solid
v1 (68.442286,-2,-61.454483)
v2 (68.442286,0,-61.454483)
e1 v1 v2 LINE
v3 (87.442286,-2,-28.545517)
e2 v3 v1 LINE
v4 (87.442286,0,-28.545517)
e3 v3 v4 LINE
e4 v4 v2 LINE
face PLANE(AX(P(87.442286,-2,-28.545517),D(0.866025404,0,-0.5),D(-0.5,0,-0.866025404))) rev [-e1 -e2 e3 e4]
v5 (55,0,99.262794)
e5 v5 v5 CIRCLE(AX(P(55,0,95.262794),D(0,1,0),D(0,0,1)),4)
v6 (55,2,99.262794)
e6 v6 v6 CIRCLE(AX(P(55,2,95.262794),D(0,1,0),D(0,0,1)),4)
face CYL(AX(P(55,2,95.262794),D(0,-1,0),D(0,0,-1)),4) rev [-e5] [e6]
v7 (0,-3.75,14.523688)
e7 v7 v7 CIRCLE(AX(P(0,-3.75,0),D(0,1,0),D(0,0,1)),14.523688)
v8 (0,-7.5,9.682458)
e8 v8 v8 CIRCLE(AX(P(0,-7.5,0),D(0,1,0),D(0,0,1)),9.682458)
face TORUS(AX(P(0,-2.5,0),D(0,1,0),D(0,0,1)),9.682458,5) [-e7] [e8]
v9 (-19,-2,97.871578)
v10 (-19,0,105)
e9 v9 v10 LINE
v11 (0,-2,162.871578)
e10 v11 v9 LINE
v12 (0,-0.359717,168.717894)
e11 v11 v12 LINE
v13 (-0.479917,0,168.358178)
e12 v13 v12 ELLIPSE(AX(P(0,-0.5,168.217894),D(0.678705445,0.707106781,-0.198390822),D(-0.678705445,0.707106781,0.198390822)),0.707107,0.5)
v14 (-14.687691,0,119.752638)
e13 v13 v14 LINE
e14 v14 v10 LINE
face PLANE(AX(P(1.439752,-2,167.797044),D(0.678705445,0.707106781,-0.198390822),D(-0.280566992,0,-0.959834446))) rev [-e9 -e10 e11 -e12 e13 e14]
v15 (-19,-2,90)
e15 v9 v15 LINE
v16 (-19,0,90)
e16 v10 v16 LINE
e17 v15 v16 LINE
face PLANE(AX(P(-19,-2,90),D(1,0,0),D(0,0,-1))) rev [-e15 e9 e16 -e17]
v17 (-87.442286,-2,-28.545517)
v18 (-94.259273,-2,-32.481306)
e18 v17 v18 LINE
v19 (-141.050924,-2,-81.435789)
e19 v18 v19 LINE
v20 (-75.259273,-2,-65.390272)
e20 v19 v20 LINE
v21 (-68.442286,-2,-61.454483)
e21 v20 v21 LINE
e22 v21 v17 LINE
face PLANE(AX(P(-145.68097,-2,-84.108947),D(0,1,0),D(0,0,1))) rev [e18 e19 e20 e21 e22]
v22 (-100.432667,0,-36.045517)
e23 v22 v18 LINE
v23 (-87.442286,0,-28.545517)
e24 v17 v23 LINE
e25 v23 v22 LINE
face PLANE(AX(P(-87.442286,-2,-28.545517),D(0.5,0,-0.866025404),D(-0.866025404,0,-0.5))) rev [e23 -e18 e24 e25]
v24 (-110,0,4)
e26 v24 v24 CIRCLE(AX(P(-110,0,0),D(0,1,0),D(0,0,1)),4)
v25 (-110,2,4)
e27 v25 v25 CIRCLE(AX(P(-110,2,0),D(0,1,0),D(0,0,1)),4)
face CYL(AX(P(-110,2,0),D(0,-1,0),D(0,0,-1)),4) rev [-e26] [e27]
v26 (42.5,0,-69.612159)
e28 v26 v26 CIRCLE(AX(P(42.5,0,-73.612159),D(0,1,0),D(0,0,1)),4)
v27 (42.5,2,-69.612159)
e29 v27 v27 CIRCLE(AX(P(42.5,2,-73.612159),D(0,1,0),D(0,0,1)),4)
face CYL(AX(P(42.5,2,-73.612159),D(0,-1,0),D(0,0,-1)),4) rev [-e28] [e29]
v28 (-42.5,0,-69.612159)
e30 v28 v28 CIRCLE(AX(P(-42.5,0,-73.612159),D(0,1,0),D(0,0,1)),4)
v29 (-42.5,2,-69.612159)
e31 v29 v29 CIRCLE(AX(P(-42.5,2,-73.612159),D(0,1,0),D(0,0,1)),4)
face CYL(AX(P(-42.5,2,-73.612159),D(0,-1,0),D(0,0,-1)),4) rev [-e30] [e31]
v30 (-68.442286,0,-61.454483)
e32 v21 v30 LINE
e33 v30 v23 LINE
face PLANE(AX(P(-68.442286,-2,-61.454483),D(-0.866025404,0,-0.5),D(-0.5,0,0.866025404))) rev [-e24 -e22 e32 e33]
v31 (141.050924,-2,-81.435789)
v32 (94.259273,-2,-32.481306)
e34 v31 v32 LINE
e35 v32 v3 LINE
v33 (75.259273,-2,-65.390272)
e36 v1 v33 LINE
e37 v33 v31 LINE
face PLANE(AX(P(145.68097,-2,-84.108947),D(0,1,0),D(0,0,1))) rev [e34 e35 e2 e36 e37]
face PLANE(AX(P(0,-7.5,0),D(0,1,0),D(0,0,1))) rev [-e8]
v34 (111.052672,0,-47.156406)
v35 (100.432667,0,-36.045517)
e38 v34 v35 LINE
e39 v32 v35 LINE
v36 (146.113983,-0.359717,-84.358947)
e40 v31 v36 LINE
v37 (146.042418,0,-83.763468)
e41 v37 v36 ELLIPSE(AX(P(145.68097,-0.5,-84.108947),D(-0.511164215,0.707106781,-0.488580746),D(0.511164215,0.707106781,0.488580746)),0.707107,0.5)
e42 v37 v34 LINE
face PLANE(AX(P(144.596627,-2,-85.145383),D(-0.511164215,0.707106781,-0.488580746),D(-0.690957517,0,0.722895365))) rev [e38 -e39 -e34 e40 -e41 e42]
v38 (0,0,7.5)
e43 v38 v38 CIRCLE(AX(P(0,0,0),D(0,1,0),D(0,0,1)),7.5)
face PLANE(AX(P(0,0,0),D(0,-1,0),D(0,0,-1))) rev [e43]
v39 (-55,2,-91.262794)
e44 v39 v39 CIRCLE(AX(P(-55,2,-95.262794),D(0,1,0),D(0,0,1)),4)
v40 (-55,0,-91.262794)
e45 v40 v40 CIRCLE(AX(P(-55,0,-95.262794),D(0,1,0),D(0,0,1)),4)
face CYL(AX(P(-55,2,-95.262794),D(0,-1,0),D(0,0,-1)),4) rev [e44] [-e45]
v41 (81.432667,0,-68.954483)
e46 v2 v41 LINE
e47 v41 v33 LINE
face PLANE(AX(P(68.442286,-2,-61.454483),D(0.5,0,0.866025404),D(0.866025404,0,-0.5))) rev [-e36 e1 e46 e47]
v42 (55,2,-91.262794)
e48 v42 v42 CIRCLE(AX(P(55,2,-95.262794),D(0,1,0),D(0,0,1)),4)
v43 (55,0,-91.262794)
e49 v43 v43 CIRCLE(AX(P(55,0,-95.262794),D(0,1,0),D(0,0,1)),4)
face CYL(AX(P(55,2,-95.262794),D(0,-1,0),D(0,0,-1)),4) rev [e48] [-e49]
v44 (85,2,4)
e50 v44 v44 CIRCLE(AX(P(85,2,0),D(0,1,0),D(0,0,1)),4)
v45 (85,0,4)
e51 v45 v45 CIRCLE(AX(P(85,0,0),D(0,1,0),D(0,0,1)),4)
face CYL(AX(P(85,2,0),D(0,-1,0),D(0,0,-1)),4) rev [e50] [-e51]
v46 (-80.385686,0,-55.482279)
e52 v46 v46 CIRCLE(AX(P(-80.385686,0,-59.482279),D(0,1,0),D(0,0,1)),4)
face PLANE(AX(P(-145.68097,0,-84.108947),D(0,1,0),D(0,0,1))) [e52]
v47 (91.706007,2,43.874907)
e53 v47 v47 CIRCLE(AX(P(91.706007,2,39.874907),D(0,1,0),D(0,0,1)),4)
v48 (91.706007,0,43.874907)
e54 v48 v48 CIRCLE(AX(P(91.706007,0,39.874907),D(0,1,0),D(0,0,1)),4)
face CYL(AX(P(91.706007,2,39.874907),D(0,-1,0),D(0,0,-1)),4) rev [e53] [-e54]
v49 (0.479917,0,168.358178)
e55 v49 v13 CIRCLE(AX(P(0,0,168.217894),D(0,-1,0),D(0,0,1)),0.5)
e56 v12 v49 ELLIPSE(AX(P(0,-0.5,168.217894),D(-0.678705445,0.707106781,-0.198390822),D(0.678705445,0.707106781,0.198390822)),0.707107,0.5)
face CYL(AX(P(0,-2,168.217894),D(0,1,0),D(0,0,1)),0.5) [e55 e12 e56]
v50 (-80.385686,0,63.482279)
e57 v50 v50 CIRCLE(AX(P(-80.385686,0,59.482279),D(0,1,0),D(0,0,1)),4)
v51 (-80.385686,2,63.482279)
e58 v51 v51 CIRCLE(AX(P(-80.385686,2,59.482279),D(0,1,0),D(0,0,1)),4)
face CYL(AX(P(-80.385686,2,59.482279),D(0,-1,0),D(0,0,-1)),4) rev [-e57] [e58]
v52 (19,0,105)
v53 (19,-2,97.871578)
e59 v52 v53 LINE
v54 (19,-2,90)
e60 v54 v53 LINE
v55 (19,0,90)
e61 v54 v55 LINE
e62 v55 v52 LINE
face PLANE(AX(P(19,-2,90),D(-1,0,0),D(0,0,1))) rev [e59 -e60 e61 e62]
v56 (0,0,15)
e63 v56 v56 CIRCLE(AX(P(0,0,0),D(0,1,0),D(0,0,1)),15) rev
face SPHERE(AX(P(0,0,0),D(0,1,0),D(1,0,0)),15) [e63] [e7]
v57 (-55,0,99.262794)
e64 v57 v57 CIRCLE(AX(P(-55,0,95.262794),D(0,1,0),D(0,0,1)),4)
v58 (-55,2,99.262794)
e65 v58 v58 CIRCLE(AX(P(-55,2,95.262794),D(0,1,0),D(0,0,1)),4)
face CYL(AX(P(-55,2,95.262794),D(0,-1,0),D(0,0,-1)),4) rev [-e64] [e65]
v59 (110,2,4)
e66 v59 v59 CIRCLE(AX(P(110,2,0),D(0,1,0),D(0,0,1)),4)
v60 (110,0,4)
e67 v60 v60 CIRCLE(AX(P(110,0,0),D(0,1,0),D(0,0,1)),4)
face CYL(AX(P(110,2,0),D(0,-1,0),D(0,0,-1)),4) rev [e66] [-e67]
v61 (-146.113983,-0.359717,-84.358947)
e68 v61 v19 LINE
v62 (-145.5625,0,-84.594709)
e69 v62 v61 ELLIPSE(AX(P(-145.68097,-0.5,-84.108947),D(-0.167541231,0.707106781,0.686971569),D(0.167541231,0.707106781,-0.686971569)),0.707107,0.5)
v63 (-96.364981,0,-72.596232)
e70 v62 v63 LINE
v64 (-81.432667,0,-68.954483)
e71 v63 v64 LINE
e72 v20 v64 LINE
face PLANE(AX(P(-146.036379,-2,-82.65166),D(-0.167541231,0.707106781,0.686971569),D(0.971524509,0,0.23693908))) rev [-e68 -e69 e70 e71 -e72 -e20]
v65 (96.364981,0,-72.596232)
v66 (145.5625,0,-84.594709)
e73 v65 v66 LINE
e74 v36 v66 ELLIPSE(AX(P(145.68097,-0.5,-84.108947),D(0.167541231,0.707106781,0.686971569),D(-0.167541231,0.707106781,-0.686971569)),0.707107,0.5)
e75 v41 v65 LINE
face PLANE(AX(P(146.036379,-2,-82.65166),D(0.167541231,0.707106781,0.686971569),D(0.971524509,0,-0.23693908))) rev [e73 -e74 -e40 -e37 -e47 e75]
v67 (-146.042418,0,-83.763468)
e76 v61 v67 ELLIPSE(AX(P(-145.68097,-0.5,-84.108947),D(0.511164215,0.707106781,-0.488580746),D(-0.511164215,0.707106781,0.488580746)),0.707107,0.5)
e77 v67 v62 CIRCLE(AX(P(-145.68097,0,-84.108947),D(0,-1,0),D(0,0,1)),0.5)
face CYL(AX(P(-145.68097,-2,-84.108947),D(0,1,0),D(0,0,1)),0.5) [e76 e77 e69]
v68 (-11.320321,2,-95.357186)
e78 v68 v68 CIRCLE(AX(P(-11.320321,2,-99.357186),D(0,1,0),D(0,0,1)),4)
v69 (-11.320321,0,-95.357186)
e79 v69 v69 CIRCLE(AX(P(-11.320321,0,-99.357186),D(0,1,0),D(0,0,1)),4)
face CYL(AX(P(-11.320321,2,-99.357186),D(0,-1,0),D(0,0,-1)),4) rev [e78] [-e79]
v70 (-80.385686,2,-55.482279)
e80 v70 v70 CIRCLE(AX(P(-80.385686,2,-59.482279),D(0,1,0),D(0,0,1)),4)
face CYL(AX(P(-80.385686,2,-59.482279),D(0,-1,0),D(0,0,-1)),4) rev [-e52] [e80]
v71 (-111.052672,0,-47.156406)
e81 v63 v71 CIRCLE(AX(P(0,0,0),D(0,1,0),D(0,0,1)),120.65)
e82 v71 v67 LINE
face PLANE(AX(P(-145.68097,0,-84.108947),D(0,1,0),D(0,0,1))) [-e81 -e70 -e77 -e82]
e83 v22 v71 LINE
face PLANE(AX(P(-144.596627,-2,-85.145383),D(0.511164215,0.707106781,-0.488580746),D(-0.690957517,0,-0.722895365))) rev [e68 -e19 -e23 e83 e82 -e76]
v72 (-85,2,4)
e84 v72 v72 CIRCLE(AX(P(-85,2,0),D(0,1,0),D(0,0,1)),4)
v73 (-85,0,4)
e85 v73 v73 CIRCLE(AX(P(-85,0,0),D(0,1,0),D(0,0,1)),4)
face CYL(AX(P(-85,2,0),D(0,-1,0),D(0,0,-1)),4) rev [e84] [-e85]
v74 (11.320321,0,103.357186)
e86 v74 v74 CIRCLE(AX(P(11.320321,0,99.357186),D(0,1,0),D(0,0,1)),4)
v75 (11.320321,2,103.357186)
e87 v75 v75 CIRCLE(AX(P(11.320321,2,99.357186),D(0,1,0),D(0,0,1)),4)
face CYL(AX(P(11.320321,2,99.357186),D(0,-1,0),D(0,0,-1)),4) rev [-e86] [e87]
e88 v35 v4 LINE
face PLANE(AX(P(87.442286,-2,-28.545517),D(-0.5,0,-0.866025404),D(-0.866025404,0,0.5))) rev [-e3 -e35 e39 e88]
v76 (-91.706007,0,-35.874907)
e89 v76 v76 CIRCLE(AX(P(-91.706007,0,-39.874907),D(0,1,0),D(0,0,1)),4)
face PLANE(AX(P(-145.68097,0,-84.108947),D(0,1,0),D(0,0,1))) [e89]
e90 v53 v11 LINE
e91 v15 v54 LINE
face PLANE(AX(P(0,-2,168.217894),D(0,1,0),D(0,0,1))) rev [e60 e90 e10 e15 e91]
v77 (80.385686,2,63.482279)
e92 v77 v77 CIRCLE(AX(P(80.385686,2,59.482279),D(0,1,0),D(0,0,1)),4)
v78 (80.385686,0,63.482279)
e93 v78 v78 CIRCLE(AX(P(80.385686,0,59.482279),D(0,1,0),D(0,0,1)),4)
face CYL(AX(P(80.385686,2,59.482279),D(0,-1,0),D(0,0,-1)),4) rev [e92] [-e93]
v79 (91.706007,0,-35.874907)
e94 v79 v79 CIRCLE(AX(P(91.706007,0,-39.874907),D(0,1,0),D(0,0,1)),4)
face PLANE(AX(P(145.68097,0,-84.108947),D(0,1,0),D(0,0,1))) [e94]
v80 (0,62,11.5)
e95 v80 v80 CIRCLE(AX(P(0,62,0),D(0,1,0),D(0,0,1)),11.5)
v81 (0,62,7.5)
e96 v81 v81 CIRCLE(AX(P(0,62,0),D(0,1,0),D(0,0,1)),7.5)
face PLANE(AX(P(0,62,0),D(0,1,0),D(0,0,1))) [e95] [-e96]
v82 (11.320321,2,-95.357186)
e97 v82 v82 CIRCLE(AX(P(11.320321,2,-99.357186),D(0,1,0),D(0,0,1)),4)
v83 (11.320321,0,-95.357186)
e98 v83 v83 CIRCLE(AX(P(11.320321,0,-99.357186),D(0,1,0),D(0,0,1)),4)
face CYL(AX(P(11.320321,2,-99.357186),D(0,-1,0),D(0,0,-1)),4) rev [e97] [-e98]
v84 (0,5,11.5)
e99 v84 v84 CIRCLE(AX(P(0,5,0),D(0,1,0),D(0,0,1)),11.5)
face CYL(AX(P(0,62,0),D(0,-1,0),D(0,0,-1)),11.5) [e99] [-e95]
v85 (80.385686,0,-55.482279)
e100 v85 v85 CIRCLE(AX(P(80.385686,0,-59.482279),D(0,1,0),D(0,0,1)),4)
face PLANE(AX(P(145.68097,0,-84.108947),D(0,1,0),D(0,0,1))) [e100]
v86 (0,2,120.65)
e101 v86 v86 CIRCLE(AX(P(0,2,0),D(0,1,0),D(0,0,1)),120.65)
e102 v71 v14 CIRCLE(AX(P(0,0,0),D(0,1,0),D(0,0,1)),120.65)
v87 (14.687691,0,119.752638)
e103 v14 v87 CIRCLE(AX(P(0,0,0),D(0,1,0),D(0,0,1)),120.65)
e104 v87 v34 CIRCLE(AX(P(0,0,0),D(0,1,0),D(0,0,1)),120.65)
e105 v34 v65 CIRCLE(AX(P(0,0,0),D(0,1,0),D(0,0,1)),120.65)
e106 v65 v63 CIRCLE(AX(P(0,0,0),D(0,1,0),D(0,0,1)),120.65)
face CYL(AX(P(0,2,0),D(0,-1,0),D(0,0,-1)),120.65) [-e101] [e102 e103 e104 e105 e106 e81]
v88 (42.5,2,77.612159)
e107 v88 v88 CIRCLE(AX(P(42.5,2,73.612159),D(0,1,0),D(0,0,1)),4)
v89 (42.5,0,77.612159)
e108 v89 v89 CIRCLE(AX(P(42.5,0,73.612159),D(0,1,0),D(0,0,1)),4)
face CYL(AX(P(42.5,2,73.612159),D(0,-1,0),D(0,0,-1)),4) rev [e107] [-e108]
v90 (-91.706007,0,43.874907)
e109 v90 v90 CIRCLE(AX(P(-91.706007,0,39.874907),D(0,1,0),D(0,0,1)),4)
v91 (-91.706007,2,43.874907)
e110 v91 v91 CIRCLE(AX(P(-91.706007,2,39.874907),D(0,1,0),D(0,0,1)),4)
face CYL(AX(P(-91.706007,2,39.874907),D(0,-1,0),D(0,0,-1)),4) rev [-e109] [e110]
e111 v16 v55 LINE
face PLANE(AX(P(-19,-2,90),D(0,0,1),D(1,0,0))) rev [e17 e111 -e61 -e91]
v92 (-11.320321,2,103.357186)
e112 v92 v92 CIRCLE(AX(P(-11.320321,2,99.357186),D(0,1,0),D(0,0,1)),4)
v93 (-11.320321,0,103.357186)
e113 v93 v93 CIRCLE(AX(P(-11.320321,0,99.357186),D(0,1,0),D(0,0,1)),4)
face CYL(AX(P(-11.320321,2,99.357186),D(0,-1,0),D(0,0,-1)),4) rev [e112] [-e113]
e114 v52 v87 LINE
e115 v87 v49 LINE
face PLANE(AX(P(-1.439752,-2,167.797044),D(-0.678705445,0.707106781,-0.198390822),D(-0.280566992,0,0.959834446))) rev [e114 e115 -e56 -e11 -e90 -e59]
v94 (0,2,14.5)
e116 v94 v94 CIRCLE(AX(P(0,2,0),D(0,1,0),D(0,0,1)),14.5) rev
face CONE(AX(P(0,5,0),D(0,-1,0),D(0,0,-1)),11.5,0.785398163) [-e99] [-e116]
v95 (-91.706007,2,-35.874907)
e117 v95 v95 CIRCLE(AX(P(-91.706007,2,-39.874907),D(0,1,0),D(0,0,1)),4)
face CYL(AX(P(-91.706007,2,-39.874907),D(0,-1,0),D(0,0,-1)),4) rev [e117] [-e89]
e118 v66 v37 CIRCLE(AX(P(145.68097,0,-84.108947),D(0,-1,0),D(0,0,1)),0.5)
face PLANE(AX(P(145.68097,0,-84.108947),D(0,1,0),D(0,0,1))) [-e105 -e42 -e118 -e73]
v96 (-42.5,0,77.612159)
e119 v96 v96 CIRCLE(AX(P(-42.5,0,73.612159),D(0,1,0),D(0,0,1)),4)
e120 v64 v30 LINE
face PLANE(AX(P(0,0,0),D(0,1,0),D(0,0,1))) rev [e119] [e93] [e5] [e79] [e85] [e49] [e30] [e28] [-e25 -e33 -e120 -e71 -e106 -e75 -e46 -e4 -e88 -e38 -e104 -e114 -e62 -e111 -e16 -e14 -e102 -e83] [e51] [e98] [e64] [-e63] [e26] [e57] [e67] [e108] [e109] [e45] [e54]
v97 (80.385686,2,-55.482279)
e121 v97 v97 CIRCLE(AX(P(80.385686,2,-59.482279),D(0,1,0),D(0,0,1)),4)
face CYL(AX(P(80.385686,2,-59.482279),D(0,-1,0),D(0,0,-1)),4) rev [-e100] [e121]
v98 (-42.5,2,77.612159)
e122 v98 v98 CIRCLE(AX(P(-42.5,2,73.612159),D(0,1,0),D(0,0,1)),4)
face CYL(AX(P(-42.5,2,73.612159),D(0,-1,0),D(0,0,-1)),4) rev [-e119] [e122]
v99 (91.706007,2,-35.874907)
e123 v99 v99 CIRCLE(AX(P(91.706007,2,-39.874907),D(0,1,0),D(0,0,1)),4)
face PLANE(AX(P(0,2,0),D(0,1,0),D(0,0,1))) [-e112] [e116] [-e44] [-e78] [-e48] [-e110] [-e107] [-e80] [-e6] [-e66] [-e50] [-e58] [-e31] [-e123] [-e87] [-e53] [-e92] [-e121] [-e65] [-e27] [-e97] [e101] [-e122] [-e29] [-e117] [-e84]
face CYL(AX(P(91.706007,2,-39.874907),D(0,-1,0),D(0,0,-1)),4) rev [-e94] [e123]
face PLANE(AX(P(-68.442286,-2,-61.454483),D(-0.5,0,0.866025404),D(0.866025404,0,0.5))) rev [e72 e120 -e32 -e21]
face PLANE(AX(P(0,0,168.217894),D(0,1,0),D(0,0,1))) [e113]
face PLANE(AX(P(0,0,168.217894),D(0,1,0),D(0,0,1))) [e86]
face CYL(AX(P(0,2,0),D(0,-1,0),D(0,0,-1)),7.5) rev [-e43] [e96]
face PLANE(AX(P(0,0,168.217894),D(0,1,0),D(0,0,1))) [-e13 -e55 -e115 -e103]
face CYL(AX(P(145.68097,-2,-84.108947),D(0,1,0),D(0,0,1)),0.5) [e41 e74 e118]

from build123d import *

# Parameters (mm, degrees)
SKETCH1_R           = 120.65
SKETCH1_R_2         = 7.5
SKETCH1_R_3         = 4
BOSS_EXTRUDE1_DEPTH = 2
SKETCH2_R           = 11.5
SKETCH2_R_2         = 7.5
BOSS_EXTRUDE2_DEPTH = 60
BOSS_EXTRUDE3_DEPTH = 2
CHAMFER1_SIZE       = 3
CHAMFER8_SIZE       = 2


with BuildPart() as part:
    # Sketch1 → Boss-Extrude1 (new body)
    with BuildSketch(Plane(origin=(0, 0, 0), x_dir=(1, 0, 0), z_dir=(0, 1, 0))):
        with Locations(Location((0, 0, 0), (0, 0, 270))):
            Circle(SKETCH1_R)
        with Locations(Location((0, 0, 0), (0, 0, 270))):
            Circle(SKETCH1_R_2, mode=Mode.SUBTRACT)
        with Locations(Location((-85, 0, 0), (0, 0, 270))):
            Circle(SKETCH1_R_3, mode=Mode.SUBTRACT)
        with Locations(Location((-42.5, 73.612159322, 0), (0, 0, 270))):
            Circle(SKETCH1_R_3, mode=Mode.SUBTRACT)
        with Locations(Location((42.5, 73.612159322, 0), (0, 0, 270))):
            Circle(SKETCH1_R_3, mode=Mode.SUBTRACT)
        with Locations(Location((85, 0, 0), (0, 0, 270))):
            Circle(SKETCH1_R_3, mode=Mode.SUBTRACT)
        with Locations(Location((42.5, -73.612159322, 0), (0, 0, 270))):
            Circle(SKETCH1_R_3, mode=Mode.SUBTRACT)
        with Locations(Location((-42.5, -73.612159322, 0), (0, 0, 270))):
            Circle(SKETCH1_R_3, mode=Mode.SUBTRACT)
        with Locations(Location((-110, 0, 0), (0, 0, 270))):
            Circle(SKETCH1_R_3, mode=Mode.SUBTRACT)
        with Locations(Location((-55, 95.262794416, 0), (0, 0, 270))):
            Circle(SKETCH1_R_3, mode=Mode.SUBTRACT)
        with Locations(Location((55, 95.262794416, 0), (0, 0, 270))):
            Circle(SKETCH1_R_3, mode=Mode.SUBTRACT)
        with Locations(Location((110, 0, 0), (0, 0, 270))):
            Circle(SKETCH1_R_3, mode=Mode.SUBTRACT)
        with Locations(Location((55, -95.262794416, 0), (0, 0, 270))):
            Circle(SKETCH1_R_3, mode=Mode.SUBTRACT)
        with Locations(Location((-55, -95.262794416, 0), (0, 0, 270))):
            Circle(SKETCH1_R_3, mode=Mode.SUBTRACT)
        with Locations(Location((-11.320321377, 99.357185568, 0), (0, 0, 270))):
            Circle(SKETCH1_R_3, mode=Mode.SUBTRACT)
        with Locations(Location((11.320321377, 99.357185568, 0), (0, 0, 270))):
            Circle(SKETCH1_R_3, mode=Mode.SUBTRACT)
        with Locations(Location((91.706007439, 39.874906893, 0), (0, 0, 270))):
            Circle(SKETCH1_R_3, mode=Mode.SUBTRACT)
        with Locations(Location((80.385686062, 59.482278675, 0), (0, 0, 270))):
            Circle(SKETCH1_R_3, mode=Mode.SUBTRACT)
        with Locations(Location((80.385686062, -59.482278675, 0), (0, 0, 270))):
            Circle(SKETCH1_R_3, mode=Mode.SUBTRACT)
        with Locations(Location((91.706007439, -39.874906893, 0), (0, 0, 270))):
            Circle(SKETCH1_R_3, mode=Mode.SUBTRACT)
        with Locations(Location((-11.320321377, -99.357185568, 0), (0, 0, 270))):
            Circle(SKETCH1_R_3, mode=Mode.SUBTRACT)
        with Locations(Location((11.320321377, -99.357185568, 0), (0, 0, 270))):
            Circle(SKETCH1_R_3, mode=Mode.SUBTRACT)
        with Locations(Location((-91.706007439, -39.874906893, 0), (0, 0, 270))):
            Circle(SKETCH1_R_3, mode=Mode.SUBTRACT)
        with Locations(Location((-80.385686062, -59.482278675, 0), (0, 0, 270))):
            Circle(SKETCH1_R_3, mode=Mode.SUBTRACT)
        with Locations(Location((-80.385686062, 59.482278675, 0), (0, 0, 270))):
            Circle(SKETCH1_R_3, mode=Mode.SUBTRACT)
        with Locations(Location((-91.706007439, 39.874906893, 0), (0, 0, 270))):
            Circle(SKETCH1_R_3, mode=Mode.SUBTRACT)
    extrude(amount=BOSS_EXTRUDE1_DEPTH)

    # Sketch2 → Boss-Extrude2 (add)
    with BuildSketch(Plane(origin=(0, 2, 0), x_dir=(1, 0, 0), z_dir=(0, 1, 0))):
        with Locations(Location((0, 0, 0), (0, 0, 270))):
            Circle(SKETCH2_R)
        with Locations(Location((0, 0, 0), (0, 0, 270))):
            Circle(SKETCH2_R_2, mode=Mode.SUBTRACT)
    extrude(amount=BOSS_EXTRUDE2_DEPTH)

    # Sketch3 → Revolve1 (revolve)
    with BuildSketch(Plane.XY, mode=Mode.PRIVATE) as revolve1_sk:
        with BuildLine():
            Line((0, 0), (15, 0))
            ThreePointArc((15, 0), (14.880445444, -1.890064387), (14.523687548, -3.75))
            ThreePointArc((14.523687548, -3.75), (12.744320544, -6.452847075), (9.682458366, -7.5))
            Line((9.682458366, -7.5), (0, -7.5))
            Line((0, -7.5), (0, 0))
        make_face()
    revolve(revolve1_sk.sketch.rotate(Axis((0, 0, 0), (0, -1, 0)), 90), axis=Axis((0, 0, 0), (0, -1, 0)))

    # Sketch4 → Boss-Extrude3 (add)
    with BuildSketch(Plane.XZ):
        with BuildLine():
            Line((-19, 90), (19, 90))
            Line((19, 90), (19, 105))
            Line((19, 105), (0.479917223, 168.358177922))
            ThreePointArc((0.479917223, 168.358177922), (0, 168.717894426), (-0.479917223, 168.358177922))
            Line((-0.479917223, 168.358177922), (-19, 105))
            Line((-19, 105), (-19, 90))
        make_face()
        with BuildLine():
            Line((81.432667397, -68.954482672), (145.562500404, -84.594709468))
            ThreePointArc((145.562500404, -84.594709468), (146.113982646, -84.358947213), (146.042417627, -83.763468454))
            Line((146.042417627, -83.763468454), (100.432667397, -36.045517328))
            Line((100.432667397, -36.045517328), (87.442286341, -28.545517328))
            Line((87.442286341, -28.545517328), (68.442286341, -61.454482672))
            Line((68.442286341, -61.454482672), (81.432667397, -68.954482672))
        make_face()
        with BuildLine():
            Line((-100.432667397, -36.045517328), (-146.042417627, -83.763468454))
            ThreePointArc((-146.042417627, -83.763468454), (-146.113982646, -84.358947213), (-145.562500404, -84.594709468))
            Line((-145.562500404, -84.594709468), (-81.432667397, -68.954482672))
            Line((-81.432667397, -68.954482672), (-68.442286341, -61.454482672))
            Line((-68.442286341, -61.454482672), (-87.442286341, -28.545517328))
            Line((-87.442286341, -28.545517328), (-100.432667397, -36.045517328))
        make_face()
    extrude(amount=BOSS_EXTRUDE3_DEPTH)

    # Chamfer1
    chamfer1_edges = [part.edges().sort_by_distance(p)[0] for p in [
        (0, 2, -11.5),
    ]]
    chamfer(chamfer1_edges, length=CHAMFER1_SIZE)

    # Chamfer8
    # the kernel refuses this chamfer: 2 mm, written as the material it takes off along each edge
    with BuildSketch(Plane(origin=(-94.391126841, -2, -29.724721105), x_dir=(0, 1, 0), z_dir=(-0.690957517475874, 0, -0.7228953652110223)), Plane(origin=(-150.55940651, -2, -85.813373872), x_dir=(0, 1, 0), z_dir=(0.9715245092887052, 0, 0.2369390804644533)), Plane(origin=(0.963141497, -2, 173.294957752), x_dir=(0, 1, 0), z_dir=(-0.2805669918128247, 0, -0.9598344456754521)), Plane(origin=(21.453199823, -2, 96.607474288), x_dir=(0, 1, 0), z_dir=(-0.2805669918128244, 0, 0.9598344456754522)), Plane(origin=(149.596265013, -2, -87.48158388), x_dir=(0, 1, 0), z_dir=(-0.6909575174758892, 0, 0.7228953652110078)), Plane(origin=(72.937927017, -2, -66.882753184), x_dir=(0, 1, 0), z_dir=(0.9715245092887104, 0, -0.23693908046443202))) as chamfer8_piece_1:
        Polygon((CHAMFER8_SIZE, 0), (0, CHAMFER8_SIZE), (0, 0), align=None)
    extrude(amount=79.896573633, mode=Mode.SUBTRACT)
    with BuildSketch(Plane(origin=(145.680969944, -2, -84.108947213), x_dir=(-0.2369390804643702, 0, -0.9715245092887255), z_dir=(-0.9715245092887255, 0, 0.2369390804643702))) as chamfer8_piece_2_section:
        Polygon((0.5, -CHAMFER8_SIZE), (0, -1.5), (0, 0), (0.5, 0), align=None)
    chamfer8_piece_2 = revolve(axis=Axis((145.680969944, -2, -84.108947213), (0, -1, 0)), revolution_arc=147.411905087, mode=Mode.PRIVATE)
    chamfer8_piece_2 = split(chamfer8_piece_2, bisect_by=Plane(origin=(145.858674254, -1.25, -83.380303831), z_dir=(-0.16754123052450473, -0.7071067811865483, -0.6869715686069793)), keep=Keep.TOP, mode=Mode.PRIVATE)
    add(chamfer8_piece_2, mode=Mode.SUBTRACT)
    with BuildSketch(Plane(origin=(145.680969944, -2, -84.108947213), x_dir=(-0.2369390804643702, 0, -0.9715245092887255), z_dir=(-0.9715245092887255, 0, 0.2369390804643702))) as chamfer8_piece_3_section:
        Polygon((0.5, -CHAMFER8_SIZE), (0, -1.5), (0, 0), (0.5, 0), align=None)
    chamfer8_piece_3 = revolve(axis=Axis((145.680969944, -2, -84.108947213), (0, -1, 0)), revolution_arc=147.411905087, mode=Mode.PRIVATE)
    chamfer8_piece_3 = split(chamfer8_piece_3, bisect_by=Plane(origin=(145.13879842, -1.25, -84.627165351), z_dir=(0.5111642148290308, -0.7071067811865457, 0.4885807461190251)), keep=Keep.TOP, mode=Mode.PRIVATE)
    add(chamfer8_piece_3, mode=Mode.SUBTRACT)
    with BuildSketch(Plane(origin=(0, -2, 168.217894426), x_dir=(0.9598344456754415, 0, 0.2805669918128611), z_dir=(0.2805669918128611, 0, -0.9598344456754415))) as chamfer8_piece_4_section:
        Polygon((0.5, -CHAMFER8_SIZE), (0, -1.5), (0, 0), (0.5, 0), align=None)
    chamfer8_piece_4 = revolve(axis=Axis((0, -2, 168.217894426), (0, -1, 0)), revolution_arc=147.411905087, mode=Mode.PRIVATE)
    chamfer8_piece_4 = split(chamfer8_piece_4, bisect_by=Plane(origin=(-0.719875834, -1.25, 168.007469182), z_dir=(0.678705445353544, -0.7071067811865469, 0.19839082248795895)), keep=Keep.TOP, mode=Mode.PRIVATE)
    add(chamfer8_piece_4, mode=Mode.SUBTRACT)
    with BuildSketch(Plane(origin=(0, -2, 168.217894426), x_dir=(0.9598344456754415, 0, 0.2805669918128611), z_dir=(0.2805669918128611, 0, -0.9598344456754415))) as chamfer8_piece_5_section:
        Polygon((0.5, -CHAMFER8_SIZE), (0, -1.5), (0, 0), (0.5, 0), align=None)
    chamfer8_piece_5 = revolve(axis=Axis((0, -2, 168.217894426), (0, -1, 0)), revolution_arc=147.411905087, mode=Mode.PRIVATE)
    chamfer8_piece_5 = split(chamfer8_piece_5, bisect_by=Plane(origin=(0.719875834, -1.25, 168.007469182), z_dir=(-0.6787054453535436, -0.707106781186547, 0.19839082248795903)), keep=Keep.TOP, mode=Mode.PRIVATE)
    add(chamfer8_piece_5, mode=Mode.SUBTRACT)
    with BuildSketch(Plane(origin=(-145.680969944, -2, -84.108947213), x_dir=(-0.7228953652110097, 0, 0.6909575174758872), z_dir=(0.6909575174758872, 0, 0.7228953652110097))) as chamfer8_piece_6_section:
        Polygon((0.5, -CHAMFER8_SIZE), (0, -1.5), (0, 0), (0.5, 0), align=None)
    chamfer8_piece_6 = revolve(axis=Axis((-145.680969944, -2, -84.108947213), (0, -1, 0)), revolution_arc=147.411905087, mode=Mode.PRIVATE)
    chamfer8_piece_6 = split(chamfer8_piece_6, bisect_by=Plane(origin=(-145.13879842, -1.25, -84.627165351), z_dir=(-0.5111642148290398, -0.7071067811865479, 0.488580746119013)), keep=Keep.TOP, mode=Mode.PRIVATE)
    add(chamfer8_piece_6, mode=Mode.SUBTRACT)
    with BuildSketch(Plane(origin=(-145.680969944, -2, -84.108947213), x_dir=(-0.7228953652110097, 0, 0.6909575174758872), z_dir=(0.6909575174758872, 0, 0.7228953652110097))) as chamfer8_piece_7_section:
        Polygon((0.5, -CHAMFER8_SIZE), (0, -1.5), (0, 0), (0.5, 0), align=None)
    chamfer8_piece_7 = revolve(axis=Axis((-145.680969944, -2, -84.108947213), (0, -1, 0)), revolution_arc=147.411905087, mode=Mode.PRIVATE)
    chamfer8_piece_7 = split(chamfer8_piece_7, bisect_by=Plane(origin=(-145.858674254, -1.25, -83.380303831), z_dir=(0.16754123052451989, -0.7071067811865478, -0.6869715686069761)), keep=Keep.TOP, mode=Mode.PRIVATE)
    add(chamfer8_piece_7, mode=Mode.SUBTRACT)


solid = part.part
